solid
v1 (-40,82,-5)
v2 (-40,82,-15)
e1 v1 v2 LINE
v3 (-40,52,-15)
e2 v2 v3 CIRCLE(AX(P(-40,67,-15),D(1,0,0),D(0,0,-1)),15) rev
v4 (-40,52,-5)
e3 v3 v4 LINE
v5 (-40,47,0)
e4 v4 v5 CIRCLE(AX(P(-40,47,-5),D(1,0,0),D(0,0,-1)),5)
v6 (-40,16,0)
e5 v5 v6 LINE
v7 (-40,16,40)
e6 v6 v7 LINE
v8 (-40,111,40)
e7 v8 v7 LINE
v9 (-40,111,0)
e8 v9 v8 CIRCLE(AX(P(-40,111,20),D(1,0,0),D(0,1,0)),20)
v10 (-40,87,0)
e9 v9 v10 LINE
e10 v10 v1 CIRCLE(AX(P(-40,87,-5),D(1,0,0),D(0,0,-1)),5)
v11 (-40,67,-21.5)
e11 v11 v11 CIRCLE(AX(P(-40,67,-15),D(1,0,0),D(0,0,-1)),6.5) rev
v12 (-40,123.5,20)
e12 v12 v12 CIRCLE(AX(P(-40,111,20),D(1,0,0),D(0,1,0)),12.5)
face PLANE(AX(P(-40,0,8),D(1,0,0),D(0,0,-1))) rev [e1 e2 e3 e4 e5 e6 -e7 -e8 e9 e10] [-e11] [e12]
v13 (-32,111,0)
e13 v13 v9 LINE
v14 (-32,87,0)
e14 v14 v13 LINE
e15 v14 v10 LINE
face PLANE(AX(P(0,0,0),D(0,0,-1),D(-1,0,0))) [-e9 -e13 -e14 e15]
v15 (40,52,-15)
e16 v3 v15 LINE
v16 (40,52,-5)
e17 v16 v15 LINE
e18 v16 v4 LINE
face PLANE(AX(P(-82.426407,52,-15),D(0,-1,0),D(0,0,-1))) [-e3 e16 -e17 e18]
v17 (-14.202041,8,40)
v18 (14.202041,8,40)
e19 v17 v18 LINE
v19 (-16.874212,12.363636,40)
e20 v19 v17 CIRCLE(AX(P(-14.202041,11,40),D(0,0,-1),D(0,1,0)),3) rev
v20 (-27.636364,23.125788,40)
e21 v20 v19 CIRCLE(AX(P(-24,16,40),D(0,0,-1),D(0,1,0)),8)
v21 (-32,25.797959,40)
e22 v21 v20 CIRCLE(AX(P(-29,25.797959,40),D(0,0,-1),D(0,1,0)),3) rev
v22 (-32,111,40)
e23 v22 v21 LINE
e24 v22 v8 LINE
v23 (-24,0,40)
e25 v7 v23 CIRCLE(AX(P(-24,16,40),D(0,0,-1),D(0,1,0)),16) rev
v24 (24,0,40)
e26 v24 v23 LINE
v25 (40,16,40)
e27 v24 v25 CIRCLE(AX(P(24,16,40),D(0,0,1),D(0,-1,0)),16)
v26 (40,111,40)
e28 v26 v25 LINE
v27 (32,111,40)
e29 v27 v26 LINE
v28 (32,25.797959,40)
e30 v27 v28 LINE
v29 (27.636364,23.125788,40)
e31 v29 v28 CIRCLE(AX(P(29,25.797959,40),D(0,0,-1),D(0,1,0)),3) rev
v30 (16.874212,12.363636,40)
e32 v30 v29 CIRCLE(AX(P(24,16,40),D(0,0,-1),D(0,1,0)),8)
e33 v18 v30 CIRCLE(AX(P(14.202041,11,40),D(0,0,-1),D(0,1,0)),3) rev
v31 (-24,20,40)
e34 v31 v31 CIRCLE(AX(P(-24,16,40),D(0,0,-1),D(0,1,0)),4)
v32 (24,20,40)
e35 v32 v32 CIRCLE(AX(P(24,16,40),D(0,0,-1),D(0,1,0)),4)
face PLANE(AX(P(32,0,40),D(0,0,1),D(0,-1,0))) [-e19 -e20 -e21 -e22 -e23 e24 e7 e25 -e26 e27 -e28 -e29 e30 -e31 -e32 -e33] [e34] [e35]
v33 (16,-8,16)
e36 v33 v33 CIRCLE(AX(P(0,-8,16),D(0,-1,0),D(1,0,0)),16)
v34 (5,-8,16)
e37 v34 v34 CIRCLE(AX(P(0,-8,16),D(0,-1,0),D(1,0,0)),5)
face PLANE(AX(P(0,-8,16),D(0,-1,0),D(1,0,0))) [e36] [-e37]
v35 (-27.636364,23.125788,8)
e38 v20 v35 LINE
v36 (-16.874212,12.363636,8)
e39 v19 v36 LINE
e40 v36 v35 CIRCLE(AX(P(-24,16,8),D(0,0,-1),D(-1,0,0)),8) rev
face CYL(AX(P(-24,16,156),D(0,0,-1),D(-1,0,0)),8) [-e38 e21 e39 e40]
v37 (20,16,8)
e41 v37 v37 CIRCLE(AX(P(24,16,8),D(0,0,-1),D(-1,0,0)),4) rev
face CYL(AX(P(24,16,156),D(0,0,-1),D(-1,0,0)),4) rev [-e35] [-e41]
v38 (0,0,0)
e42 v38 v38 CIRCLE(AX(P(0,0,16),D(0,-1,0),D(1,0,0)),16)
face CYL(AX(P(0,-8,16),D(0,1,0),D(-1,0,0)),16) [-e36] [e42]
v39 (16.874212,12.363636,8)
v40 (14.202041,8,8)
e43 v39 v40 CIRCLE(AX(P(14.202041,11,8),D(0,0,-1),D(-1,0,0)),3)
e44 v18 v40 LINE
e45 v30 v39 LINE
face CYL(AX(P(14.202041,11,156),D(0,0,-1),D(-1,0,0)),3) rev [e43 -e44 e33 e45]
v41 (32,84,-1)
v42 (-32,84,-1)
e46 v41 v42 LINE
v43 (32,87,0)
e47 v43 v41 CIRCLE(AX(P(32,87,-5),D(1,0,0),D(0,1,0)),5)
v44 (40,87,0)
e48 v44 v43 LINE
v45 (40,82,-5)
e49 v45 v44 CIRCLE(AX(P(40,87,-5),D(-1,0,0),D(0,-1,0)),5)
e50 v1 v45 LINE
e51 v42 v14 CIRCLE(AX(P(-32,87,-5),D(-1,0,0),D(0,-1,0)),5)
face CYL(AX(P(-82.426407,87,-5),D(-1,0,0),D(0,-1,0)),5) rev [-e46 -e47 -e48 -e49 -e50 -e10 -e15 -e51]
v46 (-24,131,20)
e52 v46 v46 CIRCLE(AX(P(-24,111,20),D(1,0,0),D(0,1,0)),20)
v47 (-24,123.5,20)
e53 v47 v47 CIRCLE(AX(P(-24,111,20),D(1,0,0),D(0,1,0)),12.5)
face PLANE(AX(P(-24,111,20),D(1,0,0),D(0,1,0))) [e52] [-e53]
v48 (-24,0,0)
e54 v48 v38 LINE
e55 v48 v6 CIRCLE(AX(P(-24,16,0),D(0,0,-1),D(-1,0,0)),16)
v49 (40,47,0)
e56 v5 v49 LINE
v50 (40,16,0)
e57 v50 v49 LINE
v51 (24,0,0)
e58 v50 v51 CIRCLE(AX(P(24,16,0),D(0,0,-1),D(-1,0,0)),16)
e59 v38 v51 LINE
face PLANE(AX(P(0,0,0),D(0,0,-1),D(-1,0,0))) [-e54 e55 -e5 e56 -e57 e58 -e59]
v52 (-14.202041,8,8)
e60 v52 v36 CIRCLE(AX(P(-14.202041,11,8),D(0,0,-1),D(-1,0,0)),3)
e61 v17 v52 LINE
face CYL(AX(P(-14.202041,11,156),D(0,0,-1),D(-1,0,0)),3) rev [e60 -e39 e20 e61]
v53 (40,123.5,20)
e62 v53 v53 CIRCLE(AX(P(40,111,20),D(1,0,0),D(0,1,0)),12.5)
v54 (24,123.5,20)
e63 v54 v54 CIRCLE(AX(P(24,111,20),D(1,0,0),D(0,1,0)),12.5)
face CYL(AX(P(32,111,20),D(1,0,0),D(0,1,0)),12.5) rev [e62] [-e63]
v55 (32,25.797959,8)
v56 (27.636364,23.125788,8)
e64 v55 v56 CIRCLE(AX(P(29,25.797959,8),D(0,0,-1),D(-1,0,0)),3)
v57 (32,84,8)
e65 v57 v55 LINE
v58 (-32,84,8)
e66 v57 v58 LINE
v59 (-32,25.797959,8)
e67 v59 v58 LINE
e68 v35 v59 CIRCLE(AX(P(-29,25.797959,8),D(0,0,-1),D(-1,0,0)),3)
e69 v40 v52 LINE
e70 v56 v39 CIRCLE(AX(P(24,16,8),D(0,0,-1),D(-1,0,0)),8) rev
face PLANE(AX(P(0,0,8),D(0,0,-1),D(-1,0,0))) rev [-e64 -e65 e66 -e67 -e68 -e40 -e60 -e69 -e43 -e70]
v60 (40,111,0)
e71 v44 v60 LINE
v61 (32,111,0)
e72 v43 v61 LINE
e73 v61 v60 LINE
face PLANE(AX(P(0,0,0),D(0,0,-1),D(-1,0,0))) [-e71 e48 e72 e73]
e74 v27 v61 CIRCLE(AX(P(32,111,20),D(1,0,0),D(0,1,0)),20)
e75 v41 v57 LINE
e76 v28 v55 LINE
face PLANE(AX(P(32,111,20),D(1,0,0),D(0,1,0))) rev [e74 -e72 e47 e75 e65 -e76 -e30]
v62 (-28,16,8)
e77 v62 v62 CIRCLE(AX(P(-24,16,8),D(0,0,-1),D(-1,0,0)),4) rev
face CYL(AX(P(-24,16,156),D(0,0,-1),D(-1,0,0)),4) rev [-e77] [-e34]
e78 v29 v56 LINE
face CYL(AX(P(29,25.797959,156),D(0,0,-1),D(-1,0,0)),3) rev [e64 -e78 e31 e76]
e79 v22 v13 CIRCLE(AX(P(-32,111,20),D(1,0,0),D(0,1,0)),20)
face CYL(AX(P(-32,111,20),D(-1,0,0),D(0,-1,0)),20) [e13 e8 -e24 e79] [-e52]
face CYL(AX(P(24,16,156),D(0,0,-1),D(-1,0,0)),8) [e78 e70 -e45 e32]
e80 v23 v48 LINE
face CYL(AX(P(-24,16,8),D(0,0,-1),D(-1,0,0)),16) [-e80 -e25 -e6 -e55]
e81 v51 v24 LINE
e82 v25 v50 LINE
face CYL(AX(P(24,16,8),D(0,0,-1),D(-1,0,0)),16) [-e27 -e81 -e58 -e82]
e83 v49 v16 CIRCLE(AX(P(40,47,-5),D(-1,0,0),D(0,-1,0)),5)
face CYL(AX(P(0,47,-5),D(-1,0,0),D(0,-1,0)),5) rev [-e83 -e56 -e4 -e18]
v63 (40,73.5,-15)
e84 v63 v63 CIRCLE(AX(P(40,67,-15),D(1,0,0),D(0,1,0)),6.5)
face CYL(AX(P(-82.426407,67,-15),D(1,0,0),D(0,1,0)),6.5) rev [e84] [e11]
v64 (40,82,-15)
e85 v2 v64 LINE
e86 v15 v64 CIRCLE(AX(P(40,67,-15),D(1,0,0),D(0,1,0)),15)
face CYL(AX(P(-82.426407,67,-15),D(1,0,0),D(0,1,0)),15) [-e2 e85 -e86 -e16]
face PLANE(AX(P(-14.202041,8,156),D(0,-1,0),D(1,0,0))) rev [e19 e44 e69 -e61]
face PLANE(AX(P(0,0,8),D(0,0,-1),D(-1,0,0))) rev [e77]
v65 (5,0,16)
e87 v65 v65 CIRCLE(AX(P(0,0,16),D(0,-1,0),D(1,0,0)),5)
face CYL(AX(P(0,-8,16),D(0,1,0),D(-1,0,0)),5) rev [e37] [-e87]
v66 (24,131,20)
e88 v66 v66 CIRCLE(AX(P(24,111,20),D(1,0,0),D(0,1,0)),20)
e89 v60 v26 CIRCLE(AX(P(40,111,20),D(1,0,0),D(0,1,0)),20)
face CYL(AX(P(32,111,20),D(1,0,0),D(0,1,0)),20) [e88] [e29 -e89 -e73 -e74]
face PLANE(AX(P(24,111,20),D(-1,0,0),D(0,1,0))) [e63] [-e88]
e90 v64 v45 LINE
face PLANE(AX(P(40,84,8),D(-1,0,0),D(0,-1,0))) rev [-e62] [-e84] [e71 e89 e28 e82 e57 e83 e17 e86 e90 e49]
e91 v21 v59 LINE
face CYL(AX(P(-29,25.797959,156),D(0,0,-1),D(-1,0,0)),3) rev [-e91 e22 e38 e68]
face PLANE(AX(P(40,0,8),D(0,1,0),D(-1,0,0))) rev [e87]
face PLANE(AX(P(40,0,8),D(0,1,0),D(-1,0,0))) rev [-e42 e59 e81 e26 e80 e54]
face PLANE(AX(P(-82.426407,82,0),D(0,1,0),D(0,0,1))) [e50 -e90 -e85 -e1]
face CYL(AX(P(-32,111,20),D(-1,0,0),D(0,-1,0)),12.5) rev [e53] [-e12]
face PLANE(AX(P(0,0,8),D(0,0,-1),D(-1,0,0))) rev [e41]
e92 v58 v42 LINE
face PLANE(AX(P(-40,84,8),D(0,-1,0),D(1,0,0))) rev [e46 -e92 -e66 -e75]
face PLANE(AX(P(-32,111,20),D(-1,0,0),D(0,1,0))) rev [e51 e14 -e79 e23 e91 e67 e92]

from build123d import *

# Parameters (mm, degrees)
SKETCH1_W           = 84
SKETCH1_H           = 80
BOSS_EXTRUDE1_DEPTH = 8
SKETCH2_R           = 12.5
BOSS_EXTRUDE3_DEPTH = 8
FILLET1_R           = 16
SKETCH3_R           = 4
BOSS_EXTRUDE4_DEPTH = 40
SKETCH4_R           = 20
SKETCH4_R_2         = 12.5
BOSS_EXTRUDE5_DEPTH = 8
SKETCH5_R           = 6.5
BOSS_EXTRUDE6_DEPTH = 80
FILLET2_R           = 5
SKETCH6_R           = 16
SKETCH6_R_2         = 5
BOSS_EXTRUDE7_DEPTH = 8


with BuildPart() as part:
    # Sketch1 → Boss-Extrude1 (new body)
    with BuildSketch(Plane(origin=(0, 0, 0), x_dir=(0, 1, 0), z_dir=(0, 0, 1))):
        with Locations((42, 0)):
            Rectangle(SKETCH1_W, SKETCH1_H)
    extrude(amount=BOSS_EXTRUDE1_DEPTH)

    # Sketch2 → Boss-Extrude3 (add)
    with BuildSketch(Plane.YZ.offset(40)):
        with BuildLine():
            Line((0, 0), (0, 40))
            Line((0, 40), (111, 40))
            ThreePointArc((111, 40), (131, 20), (111, 0))
            Line((111, 0), (0, 0))
        make_face()
        with Locations((111, 20)):
            Circle(SKETCH2_R, mode=Mode.SUBTRACT)
    boss_extrude3 = extrude(amount=-BOSS_EXTRUDE3_DEPTH)

    # Mirror1: Boss-Extrude3 across plane
    add(boss_extrude3.mirror(Plane(origin=(0, 0, 0), x_dir=(0, 0, 1), z_dir=(1, 0, 0))))

    # Fillet1
    fillet1_edges = [part.edges().sort_by_distance(p)[0] for p in [
        (-40, 0, 20),
        (40, 0, 20),
    ]]
    fillet(fillet1_edges, radius=FILLET1_R)

    # Sketch3 → Boss-Extrude4 (add)
    with BuildSketch(Plane(origin=(0, 0, 0), x_dir=(0, 1, 0), z_dir=(0, 0, 1))):
        with BuildLine():
            Line((8, 14.202041029), (8, -14.202041029))
            ThreePointArc((8, -14.202041029), (9.433301096, -16.760449625), (12.363636364, -16.874211657))
            ThreePointArc((12.363636364, -16.874211657), (21.656854249, -18.343145751), (23.125788343, -27.636363636))
            ThreePointArc((23.125788343, -27.636363636), (23.239550375, -30.566698904), (25.797958971, -32))
            Line((25.797958971, -32), (84, -32))
            Line((84, -32), (84, -40))
            Line((84, -40), (16, -40))
            ThreePointArc((16, -40), (4.686291501, -35.313708499), (0, -24))
            Line((0, -24), (0, 24))
            ThreePointArc((0, 24), (4.686291501, 35.313708499), (16, 40))
            Line((16, 40), (84, 40))
            Line((84, 40), (84, 32))
            Line((84, 32), (25.797958971, 32))
            ThreePointArc((25.797958971, 32), (23.239550375, 30.566698904), (23.125788343, 27.636363636))
            ThreePointArc((23.125788343, 27.636363636), (21.656854249, 18.343145751), (12.363636364, 16.874211657))
            ThreePointArc((12.363636364, 16.874211657), (9.433301096, 16.760449625), (8, 14.202041029))
        make_face()
        with Locations(Location((16, 24, 0), (0, 0, 90))):
            Circle(SKETCH3_R, mode=Mode.SUBTRACT)
        with Locations(Location((16, -24, 0), (0, 0, 90))):
            Circle(SKETCH3_R, mode=Mode.SUBTRACT)
    extrude(amount=BOSS_EXTRUDE4_DEPTH)

    # Sketch4 → Boss-Extrude5 (add)
    with BuildSketch(Plane.YZ.offset(-32)):
        with Locations(Location((111, 20, 0), (0, 0, 90))):
            Circle(SKETCH4_R)
        with Locations((111, 20)):
            Circle(SKETCH4_R_2, mode=Mode.SUBTRACT)
    boss_extrude5 = extrude(amount=BOSS_EXTRUDE5_DEPTH)

    # Mirror2: Boss-Extrude5 across plane
    add(boss_extrude5.mirror(Plane(origin=(0, 0, 0), x_dir=(0, 0, 1), z_dir=(1, 0, 0))))

    # Sketch5 → Boss-Extrude6 (add)
    with BuildSketch(Plane.YZ.offset(40)):
        with BuildLine():
            Line((52, -15), (52, 0))
            Line((52, 0), (82, 0))
            Line((82, 0), (82, -15))
            ThreePointArc((82, -15), (67, -30), (52, -15))
        make_face()
        with Locations((67, -15)):
            Circle(SKETCH5_R, mode=Mode.SUBTRACT)
    extrude(amount=-BOSS_EXTRUDE6_DEPTH)

    # Fillet2
    # the kernel refuses this fillet: 5 mm, written as the material it adds along each edge
    with BuildSketch(Plane(origin=(40, 82, 0), x_dir=(0, 1, 0), z_dir=(-1, 0, 0))) as fillet2_piece_1_section:
        with BuildLine():
            CenterArc((FILLET2_R, FILLET2_R), FILLET2_R, 180, 90)
            Line((0, FILLET2_R), (0, 0))
            Line((0, 0), (FILLET2_R, 0))
        make_face()
    fillet2_piece_1 = extrude(amount=80, mode=Mode.PRIVATE)
    fillet2_piece_1 = split(fillet2_piece_1, bisect_by=Plane(origin=(32, 84.91705828, -0.211887472), z_dir=(1, 0, 0)), keep=Keep.TOP, mode=Mode.PRIVATE)
    fillet2_piece_1 = split(fillet2_piece_1, bisect_by=Plane(origin=(36, 84, -0.211887472), z_dir=(0, 1, 0)), keep=Keep.TOP, mode=Mode.PRIVATE)
    add(fillet2_piece_1)
    with BuildSketch(Plane(origin=(40, 82, 0), x_dir=(0, 1, 0), z_dir=(-1, 0, 0))) as fillet2_piece_2_section:
        with BuildLine():
            CenterArc((FILLET2_R, FILLET2_R), FILLET2_R, 180, 90)
            Line((0, FILLET2_R), (0, 0))
            Line((0, 0), (FILLET2_R, 0))
        make_face()
    fillet2_piece_2 = extrude(amount=80, mode=Mode.PRIVATE)
    fillet2_piece_2 = split(fillet2_piece_2, bisect_by=Plane(origin=(32, 82.693888299, -1.35777961), z_dir=(1, 0, 0)), keep=Keep.TOP, mode=Mode.PRIVATE)
    fillet2_piece_2 = split(fillet2_piece_2, bisect_by=Plane(origin=(36, 84, -1.35777961), z_dir=(0, -1, 0)), keep=Keep.TOP, mode=Mode.PRIVATE)
    add(fillet2_piece_2)
    with BuildSketch(Plane(origin=(40, 82, 0), x_dir=(0, 1, 0), z_dir=(-1, 0, 0))) as fillet2_piece_3_section:
        with BuildLine():
            CenterArc((FILLET2_R, FILLET2_R), FILLET2_R, 180, 90)
            Line((0, FILLET2_R), (0, 0))
            Line((0, 0), (FILLET2_R, 0))
        make_face()
    fillet2_piece_3 = extrude(amount=80, mode=Mode.PRIVATE)
    fillet2_piece_3 = split(fillet2_piece_3, bisect_by=Plane(origin=(32, 82.693888299, -1.35777961), z_dir=(-1, 0, 0)), keep=Keep.TOP, mode=Mode.PRIVATE)
    fillet2_piece_3 = split(fillet2_piece_3, bisect_by=Plane(origin=(-32, 82.693888299, -1.35777961), z_dir=(1, 0, 0)), keep=Keep.TOP, mode=Mode.PRIVATE)
    fillet2_piece_3 = split(fillet2_piece_3, bisect_by=Plane(origin=(0, 84, -1.35777961), z_dir=(0, -1, 0)), keep=Keep.TOP, mode=Mode.PRIVATE)
    add(fillet2_piece_3)
    with BuildSketch(Plane(origin=(40, 82, 0), x_dir=(0, 1, 0), z_dir=(-1, 0, 0))) as fillet2_piece_4_section:
        with BuildLine():
            CenterArc((FILLET2_R, FILLET2_R), FILLET2_R, 180, 90)
            Line((0, FILLET2_R), (0, 0))
            Line((0, 0), (FILLET2_R, 0))
        make_face()
    fillet2_piece_4 = extrude(amount=80, mode=Mode.PRIVATE)
    fillet2_piece_4 = split(fillet2_piece_4, bisect_by=Plane(origin=(-32, 84.91705828, -0.211887472), z_dir=(-1, 0, 0)), keep=Keep.TOP, mode=Mode.PRIVATE)
    fillet2_piece_4 = split(fillet2_piece_4, bisect_by=Plane(origin=(-36, 84, -0.211887472), z_dir=(0, 1, 0)), keep=Keep.TOP, mode=Mode.PRIVATE)
    add(fillet2_piece_4)
    with BuildSketch(Plane(origin=(40, 82, 0), x_dir=(0, 1, 0), z_dir=(-1, 0, 0))) as fillet2_piece_5_section:
        with BuildLine():
            CenterArc((FILLET2_R, FILLET2_R), FILLET2_R, 180, 90)
            Line((0, FILLET2_R), (0, 0))
            Line((0, 0), (FILLET2_R, 0))
        make_face()
    fillet2_piece_5 = extrude(amount=80, mode=Mode.PRIVATE)
    fillet2_piece_5 = split(fillet2_piece_5, bisect_by=Plane(origin=(-32, 82.693888299, -1.35777961), z_dir=(-1, 0, 0)), keep=Keep.TOP, mode=Mode.PRIVATE)
    fillet2_piece_5 = split(fillet2_piece_5, bisect_by=Plane(origin=(-36, 84, -1.35777961), z_dir=(0, -1, 0)), keep=Keep.TOP, mode=Mode.PRIVATE)
    add(fillet2_piece_5)
    with BuildSketch(Plane(origin=(40, 52, 0), x_dir=(0, -1, 0), z_dir=(-1, 0, 0))) as fillet2_piece_6:
        with BuildLine():
            CenterArc((FILLET2_R, -FILLET2_R), FILLET2_R, 90, 90)
            Line((0, -FILLET2_R), (0, 0))
            Line((0, 0), (FILLET2_R, 0))
        make_face()
    extrude(amount=80)

    # Sketch6 → Boss-Extrude7 (add)
    with BuildSketch(Plane.XZ):
        with Locations(Location((0, 16, 0), (0, 0, 270))):
            Circle(SKETCH6_R)
        with Locations((0, 16)):
            Circle(SKETCH6_R_2, mode=Mode.SUBTRACT)
    extrude(amount=BOSS_EXTRUDE7_DEPTH)


solid = part.part
